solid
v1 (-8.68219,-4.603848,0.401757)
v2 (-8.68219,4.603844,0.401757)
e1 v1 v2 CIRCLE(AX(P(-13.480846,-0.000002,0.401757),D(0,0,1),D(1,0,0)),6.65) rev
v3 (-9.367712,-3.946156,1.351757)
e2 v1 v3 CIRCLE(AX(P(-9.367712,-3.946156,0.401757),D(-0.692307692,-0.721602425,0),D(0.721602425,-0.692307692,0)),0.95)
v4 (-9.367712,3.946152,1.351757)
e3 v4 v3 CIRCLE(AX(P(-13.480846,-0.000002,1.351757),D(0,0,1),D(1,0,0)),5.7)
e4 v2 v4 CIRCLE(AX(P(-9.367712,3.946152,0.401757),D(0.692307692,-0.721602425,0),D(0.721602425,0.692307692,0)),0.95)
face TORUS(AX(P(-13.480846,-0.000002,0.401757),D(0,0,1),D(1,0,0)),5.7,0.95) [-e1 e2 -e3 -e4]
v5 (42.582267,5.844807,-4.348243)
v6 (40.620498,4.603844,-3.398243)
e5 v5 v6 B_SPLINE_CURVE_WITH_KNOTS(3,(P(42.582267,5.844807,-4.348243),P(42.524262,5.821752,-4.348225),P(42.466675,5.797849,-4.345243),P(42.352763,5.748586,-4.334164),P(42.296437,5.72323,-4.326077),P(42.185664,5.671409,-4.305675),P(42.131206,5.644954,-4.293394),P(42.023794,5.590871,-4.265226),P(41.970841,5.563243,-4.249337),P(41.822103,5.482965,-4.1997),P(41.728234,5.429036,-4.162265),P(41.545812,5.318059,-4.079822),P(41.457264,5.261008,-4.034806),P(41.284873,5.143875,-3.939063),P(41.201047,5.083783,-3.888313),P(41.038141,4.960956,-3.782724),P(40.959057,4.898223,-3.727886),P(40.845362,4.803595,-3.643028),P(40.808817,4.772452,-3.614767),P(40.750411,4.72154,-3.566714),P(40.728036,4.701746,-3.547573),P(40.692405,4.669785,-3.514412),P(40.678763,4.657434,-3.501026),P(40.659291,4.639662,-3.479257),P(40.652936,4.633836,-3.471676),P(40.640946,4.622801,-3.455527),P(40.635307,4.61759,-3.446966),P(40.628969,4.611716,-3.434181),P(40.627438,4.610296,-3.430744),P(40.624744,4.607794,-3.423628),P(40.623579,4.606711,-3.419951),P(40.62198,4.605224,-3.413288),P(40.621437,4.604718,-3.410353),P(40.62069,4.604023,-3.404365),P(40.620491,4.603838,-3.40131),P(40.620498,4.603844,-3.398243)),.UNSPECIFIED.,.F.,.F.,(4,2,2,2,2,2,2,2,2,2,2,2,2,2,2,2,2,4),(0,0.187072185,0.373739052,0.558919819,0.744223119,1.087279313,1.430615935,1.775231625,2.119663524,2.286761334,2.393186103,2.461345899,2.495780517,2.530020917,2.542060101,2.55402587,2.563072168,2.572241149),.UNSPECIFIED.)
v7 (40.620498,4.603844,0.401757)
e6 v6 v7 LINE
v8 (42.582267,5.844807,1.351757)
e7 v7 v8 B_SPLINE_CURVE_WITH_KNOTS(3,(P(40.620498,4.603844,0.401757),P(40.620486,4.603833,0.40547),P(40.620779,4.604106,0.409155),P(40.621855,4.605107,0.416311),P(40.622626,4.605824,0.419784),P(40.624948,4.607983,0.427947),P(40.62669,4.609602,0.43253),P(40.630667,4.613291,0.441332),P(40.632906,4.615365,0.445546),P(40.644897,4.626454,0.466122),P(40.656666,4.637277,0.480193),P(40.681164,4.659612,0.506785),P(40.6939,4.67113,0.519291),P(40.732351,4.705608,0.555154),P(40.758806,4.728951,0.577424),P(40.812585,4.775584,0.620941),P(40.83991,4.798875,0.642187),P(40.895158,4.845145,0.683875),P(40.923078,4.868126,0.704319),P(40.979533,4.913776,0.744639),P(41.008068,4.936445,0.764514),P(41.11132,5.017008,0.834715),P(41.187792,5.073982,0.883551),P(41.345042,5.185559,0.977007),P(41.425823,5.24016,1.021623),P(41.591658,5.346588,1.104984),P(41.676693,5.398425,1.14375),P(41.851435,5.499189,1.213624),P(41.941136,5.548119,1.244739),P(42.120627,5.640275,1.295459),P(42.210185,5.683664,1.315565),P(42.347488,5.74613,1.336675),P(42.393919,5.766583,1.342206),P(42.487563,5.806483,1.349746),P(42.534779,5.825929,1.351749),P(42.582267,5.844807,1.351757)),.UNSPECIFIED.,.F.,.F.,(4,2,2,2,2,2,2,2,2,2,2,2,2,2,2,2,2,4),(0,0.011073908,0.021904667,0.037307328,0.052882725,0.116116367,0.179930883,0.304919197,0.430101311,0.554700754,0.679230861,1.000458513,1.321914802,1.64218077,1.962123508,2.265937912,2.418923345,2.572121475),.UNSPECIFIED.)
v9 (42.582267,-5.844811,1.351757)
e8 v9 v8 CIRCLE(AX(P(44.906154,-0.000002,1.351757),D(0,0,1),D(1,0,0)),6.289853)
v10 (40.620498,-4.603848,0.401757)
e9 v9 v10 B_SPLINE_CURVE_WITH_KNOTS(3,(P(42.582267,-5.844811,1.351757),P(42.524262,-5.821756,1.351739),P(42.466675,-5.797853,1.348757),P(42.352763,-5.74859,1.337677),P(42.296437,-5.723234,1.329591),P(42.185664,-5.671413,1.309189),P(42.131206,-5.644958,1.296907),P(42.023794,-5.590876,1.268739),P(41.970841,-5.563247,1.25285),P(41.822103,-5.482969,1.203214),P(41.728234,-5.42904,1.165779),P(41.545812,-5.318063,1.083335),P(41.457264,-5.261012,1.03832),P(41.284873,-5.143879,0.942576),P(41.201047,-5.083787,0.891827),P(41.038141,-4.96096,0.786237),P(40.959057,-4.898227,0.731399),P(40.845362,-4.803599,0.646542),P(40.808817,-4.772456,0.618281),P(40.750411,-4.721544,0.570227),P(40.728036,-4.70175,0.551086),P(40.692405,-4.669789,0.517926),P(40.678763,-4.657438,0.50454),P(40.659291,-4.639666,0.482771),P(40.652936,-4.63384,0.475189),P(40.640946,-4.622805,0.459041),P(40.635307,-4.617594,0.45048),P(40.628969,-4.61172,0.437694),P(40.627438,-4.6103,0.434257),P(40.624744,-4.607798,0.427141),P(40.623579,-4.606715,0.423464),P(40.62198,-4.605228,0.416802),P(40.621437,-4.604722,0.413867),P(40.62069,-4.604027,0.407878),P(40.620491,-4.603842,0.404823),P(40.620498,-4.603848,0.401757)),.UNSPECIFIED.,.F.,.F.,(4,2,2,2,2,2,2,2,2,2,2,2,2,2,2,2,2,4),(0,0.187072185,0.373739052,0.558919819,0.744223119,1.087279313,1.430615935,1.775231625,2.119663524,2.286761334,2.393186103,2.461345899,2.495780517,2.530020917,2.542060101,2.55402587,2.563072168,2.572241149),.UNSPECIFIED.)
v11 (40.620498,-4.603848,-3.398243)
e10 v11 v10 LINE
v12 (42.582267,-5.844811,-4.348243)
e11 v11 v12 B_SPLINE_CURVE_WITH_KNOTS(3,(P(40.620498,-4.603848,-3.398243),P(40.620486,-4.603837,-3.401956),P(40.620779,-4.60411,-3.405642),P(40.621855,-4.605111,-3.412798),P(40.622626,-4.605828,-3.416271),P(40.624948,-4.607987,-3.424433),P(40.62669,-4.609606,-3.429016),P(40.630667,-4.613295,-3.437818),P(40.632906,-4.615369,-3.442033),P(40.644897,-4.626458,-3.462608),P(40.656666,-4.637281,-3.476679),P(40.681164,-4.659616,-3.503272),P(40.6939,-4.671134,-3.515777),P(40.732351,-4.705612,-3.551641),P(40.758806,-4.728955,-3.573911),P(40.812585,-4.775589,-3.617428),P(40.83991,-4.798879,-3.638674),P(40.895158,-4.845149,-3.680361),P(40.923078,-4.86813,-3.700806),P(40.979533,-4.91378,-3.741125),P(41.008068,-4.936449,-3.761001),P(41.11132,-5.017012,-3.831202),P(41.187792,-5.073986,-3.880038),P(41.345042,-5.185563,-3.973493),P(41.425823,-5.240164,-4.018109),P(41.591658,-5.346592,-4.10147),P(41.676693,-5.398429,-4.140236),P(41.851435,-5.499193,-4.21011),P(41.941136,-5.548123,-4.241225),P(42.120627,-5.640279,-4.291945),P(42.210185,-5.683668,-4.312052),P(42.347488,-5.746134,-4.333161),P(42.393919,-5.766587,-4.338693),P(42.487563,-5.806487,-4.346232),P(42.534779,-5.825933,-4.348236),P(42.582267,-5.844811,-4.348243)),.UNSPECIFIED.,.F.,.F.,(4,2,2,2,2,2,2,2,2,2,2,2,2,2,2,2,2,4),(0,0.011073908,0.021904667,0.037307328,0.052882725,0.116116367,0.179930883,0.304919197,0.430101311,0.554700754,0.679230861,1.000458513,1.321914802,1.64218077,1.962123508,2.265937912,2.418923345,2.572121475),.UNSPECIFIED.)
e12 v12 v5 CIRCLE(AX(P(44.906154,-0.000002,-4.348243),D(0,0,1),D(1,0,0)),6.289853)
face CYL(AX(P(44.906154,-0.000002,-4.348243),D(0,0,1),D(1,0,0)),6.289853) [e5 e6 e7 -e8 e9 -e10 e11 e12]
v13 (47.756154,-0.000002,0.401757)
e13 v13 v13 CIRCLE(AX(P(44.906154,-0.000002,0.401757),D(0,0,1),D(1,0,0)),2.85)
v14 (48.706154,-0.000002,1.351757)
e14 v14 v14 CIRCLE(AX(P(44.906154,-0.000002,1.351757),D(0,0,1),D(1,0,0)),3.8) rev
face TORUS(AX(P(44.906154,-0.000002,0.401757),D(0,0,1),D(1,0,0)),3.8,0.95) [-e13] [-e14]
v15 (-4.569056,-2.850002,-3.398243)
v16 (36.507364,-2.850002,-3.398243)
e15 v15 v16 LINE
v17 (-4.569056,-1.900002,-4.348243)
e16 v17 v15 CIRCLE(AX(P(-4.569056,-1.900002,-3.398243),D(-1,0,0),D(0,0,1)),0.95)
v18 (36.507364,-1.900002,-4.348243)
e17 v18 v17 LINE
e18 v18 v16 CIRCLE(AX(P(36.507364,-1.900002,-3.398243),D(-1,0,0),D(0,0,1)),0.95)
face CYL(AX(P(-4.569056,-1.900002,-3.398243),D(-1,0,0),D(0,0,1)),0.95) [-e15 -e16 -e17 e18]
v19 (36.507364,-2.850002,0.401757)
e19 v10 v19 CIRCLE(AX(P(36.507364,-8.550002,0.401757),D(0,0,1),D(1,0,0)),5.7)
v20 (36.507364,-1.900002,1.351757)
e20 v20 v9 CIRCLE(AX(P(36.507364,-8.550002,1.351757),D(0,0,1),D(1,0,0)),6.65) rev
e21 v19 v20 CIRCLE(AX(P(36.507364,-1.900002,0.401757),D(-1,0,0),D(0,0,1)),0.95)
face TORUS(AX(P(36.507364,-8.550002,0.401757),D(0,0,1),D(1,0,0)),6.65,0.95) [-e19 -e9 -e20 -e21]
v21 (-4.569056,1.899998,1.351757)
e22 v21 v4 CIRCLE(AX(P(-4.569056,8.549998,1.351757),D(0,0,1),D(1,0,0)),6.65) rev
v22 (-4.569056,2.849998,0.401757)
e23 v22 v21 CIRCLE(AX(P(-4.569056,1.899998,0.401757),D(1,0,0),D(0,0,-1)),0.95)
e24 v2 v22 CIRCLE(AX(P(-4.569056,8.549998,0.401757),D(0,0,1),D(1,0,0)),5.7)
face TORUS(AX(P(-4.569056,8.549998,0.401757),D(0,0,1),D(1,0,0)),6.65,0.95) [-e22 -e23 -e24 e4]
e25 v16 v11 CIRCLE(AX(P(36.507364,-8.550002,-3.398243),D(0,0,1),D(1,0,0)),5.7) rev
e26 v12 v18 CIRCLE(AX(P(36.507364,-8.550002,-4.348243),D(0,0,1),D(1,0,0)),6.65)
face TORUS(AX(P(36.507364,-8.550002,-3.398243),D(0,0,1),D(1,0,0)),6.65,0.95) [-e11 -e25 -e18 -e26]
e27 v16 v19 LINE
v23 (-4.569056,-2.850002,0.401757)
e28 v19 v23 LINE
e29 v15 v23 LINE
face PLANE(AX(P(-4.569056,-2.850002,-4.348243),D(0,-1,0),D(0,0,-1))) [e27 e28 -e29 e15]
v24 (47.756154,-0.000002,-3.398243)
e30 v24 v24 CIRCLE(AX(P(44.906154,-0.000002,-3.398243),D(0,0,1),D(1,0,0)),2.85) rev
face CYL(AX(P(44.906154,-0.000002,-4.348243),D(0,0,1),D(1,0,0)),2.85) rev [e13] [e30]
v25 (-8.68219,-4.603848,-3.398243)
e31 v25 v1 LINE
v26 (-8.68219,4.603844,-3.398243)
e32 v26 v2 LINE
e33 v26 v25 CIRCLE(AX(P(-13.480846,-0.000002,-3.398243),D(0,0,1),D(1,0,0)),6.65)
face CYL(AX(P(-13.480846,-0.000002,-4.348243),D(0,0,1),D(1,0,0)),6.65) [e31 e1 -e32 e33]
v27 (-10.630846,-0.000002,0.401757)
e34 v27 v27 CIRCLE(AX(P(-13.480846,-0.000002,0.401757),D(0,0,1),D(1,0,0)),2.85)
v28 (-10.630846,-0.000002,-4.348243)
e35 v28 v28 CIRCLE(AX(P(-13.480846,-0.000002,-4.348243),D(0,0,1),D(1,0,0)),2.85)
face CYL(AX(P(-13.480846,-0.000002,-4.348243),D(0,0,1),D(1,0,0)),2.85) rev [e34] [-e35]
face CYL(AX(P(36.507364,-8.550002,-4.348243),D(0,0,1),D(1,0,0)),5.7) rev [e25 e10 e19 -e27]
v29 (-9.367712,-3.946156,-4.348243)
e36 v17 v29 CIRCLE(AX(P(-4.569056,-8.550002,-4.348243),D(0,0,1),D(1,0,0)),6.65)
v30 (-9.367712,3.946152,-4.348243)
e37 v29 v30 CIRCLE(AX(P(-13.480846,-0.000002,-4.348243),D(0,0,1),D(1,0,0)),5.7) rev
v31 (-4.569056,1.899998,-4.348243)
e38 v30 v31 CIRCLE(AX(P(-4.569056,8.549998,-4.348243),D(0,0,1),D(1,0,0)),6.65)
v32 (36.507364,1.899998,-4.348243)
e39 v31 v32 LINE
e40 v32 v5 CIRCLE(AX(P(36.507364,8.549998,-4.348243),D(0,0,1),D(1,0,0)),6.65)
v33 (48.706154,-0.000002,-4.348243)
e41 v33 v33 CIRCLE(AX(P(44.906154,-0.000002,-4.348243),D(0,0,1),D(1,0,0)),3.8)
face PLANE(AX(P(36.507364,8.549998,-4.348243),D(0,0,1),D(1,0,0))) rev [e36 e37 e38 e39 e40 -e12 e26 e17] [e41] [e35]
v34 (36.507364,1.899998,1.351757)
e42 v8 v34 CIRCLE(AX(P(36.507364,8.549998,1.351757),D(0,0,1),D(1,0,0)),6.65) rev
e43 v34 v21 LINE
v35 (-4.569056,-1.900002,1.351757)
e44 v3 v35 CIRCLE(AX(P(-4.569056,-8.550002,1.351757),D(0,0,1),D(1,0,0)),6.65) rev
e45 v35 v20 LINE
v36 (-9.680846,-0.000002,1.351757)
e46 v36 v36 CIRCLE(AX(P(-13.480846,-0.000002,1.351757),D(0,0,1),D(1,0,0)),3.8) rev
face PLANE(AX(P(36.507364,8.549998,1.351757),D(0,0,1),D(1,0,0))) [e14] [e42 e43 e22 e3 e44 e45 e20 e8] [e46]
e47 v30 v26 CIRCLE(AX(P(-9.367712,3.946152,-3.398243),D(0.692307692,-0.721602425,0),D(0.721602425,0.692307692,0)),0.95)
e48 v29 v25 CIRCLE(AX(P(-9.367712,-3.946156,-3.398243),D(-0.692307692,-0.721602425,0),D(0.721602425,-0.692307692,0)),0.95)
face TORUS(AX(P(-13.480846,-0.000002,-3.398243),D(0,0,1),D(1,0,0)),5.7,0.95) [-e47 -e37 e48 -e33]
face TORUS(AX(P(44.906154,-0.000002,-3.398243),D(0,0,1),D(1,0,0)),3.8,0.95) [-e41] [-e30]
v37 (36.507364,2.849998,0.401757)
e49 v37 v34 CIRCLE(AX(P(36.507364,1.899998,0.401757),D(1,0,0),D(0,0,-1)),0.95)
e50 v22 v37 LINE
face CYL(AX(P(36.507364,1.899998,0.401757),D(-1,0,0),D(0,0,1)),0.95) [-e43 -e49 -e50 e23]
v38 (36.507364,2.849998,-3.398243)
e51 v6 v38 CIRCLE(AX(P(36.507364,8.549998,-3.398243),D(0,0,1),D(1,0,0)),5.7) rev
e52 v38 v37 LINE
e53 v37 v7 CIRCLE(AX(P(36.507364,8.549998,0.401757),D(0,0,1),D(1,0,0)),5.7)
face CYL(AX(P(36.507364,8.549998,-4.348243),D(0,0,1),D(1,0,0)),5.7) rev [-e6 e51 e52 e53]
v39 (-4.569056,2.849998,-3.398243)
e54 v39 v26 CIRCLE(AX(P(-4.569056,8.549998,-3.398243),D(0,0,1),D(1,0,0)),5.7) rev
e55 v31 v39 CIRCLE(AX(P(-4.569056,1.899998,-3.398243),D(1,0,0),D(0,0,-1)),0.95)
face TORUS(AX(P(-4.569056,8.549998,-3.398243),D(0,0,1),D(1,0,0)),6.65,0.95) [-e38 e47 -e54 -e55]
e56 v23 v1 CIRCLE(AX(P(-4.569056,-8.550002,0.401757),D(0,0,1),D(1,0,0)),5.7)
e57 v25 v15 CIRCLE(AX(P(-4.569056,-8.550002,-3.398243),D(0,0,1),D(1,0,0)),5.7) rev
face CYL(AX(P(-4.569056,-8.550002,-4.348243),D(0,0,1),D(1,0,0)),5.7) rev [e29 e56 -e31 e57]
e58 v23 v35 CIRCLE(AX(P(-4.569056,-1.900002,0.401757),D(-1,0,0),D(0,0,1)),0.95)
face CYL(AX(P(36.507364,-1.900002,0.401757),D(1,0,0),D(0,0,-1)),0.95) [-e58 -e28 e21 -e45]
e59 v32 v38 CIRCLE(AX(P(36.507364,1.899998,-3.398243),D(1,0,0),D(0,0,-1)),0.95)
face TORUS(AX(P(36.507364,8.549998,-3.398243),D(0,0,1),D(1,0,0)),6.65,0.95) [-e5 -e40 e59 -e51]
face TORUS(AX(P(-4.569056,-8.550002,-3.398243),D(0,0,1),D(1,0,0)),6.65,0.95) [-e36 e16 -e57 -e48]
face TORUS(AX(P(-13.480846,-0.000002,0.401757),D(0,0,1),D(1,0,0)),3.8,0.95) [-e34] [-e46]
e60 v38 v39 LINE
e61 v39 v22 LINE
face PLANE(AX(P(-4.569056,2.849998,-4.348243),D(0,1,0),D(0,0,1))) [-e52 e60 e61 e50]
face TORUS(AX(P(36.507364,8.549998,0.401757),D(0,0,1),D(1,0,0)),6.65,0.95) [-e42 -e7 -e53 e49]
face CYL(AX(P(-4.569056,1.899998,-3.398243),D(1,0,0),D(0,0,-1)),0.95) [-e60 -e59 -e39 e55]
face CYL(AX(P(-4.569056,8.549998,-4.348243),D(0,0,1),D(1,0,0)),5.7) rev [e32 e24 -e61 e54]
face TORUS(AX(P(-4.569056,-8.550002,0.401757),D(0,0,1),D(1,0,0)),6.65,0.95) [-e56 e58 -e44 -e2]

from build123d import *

# Parameters (mm, degrees)
SKETCH1_R           = 1.5
SKETCH1_R_2         = 1.500000000000004
BOSS_EXTRUDE1_DEPTH = 3
FILLET1_R           = 0.5
SCALE1_SCALE        = 1.9


with BuildPart() as part:
    # Sketch1 → Boss-Extrude1 (new body)
    with BuildSketch(Plane.XY):
        with BuildLine():
            Line((4.690415759823431, 1.5), (26.30958424017657, 1.5))
            ThreePointArc((26.30958424017657, 1.5), (27.486281051005673, 1.7404013669766005), (28.474391513941228, 2.4230769230769225))
            ThreePointArc((28.474391513941228, 2.4230769230769225), (34.04044882418204, 0), (28.474391513941228, -2.4230769230769225))
            ThreePointArc((28.474391513941228, -2.4230769230769225), (27.486281051005673, -1.7404013669766005), (26.30958424017657, -1.5))
            Line((26.30958424017657, -1.5), (4.690415759823431, -1.5))
            ThreePointArc((4.690415759823431, -1.5), (3.5137189489943266, -1.7404013669766005), (2.5256084860587706, -2.4230769230769234))
            ThreePointArc((2.5256084860587706, -2.4230769230769234), (-3.500000000000001, 4.3e-16), (2.5256084860587706, 2.4230769230769234))
            ThreePointArc((2.5256084860587706, 2.4230769230769234), (3.5137189489943266, 1.7404013669766005), (4.690415759823431, 1.5))
        make_face()
        Circle(SKETCH1_R, mode=Mode.SUBTRACT)
        with Locations((30.73, 0)):
            Circle(SKETCH1_R_2, mode=Mode.SUBTRACT)
    extrude(amount=-BOSS_EXTRUDE1_DEPTH)

    # Fillet1
    # the kernel refuses this fillet: 0.5 mm, written as the material it takes off along each edge
    with BuildSketch(Plane(origin=(-6e-17, 2.2e-16, 0), x_dir=(0.7216024245882201, -0.6923076923076922, 0), z_dir=(0.6923076923076922, 0.7216024245882201, 0))) as fillet1_piece_1:
        with BuildLine():
            CenterArc((3.5000000000000013 - FILLET1_R, FILLET1_R), FILLET1_R, 269.99999999999994, 90.00000000000006)
            Line((3.5000000000000013 - FILLET1_R, -6e-17), (3.5000000000000013, 0))
            Line((3.5000000000000013, 0), (3.5000000000000013, FILLET1_R))
        make_face()
    revolve(axis=Axis((-6e-17, 2.2e-16, 0), (0, 0, -1)), revolution_arc=272.37387707919373, mode=Mode.SUBTRACT)
    with BuildSketch(Plane(origin=(4.6904157598234315, 4.5, 0), x_dir=(-0.7216024245882201, -0.6923076923076921, 0), z_dir=(-0.6923076923076921, 0.7216024245882201, 0))) as fillet1_piece_2:
        with BuildLine():
            CenterArc((3 + FILLET1_R, -FILLET1_R), FILLET1_R, 89.99999999999994, 90.00000000000006)
            Line((3 + FILLET1_R, 6e-17), (3, 0))
            Line((3, 0), (2.9999999999999996, -FILLET1_R))
        make_face()
    revolve(axis=Axis((4.6904157598234315, 4.5, 0), (0, 0, 1)), revolution_arc=46.18693853959685, mode=Mode.SUBTRACT)
    with BuildSketch(Plane(origin=(4.690415759823431, 1.5, 0), x_dir=(0, 0, -1), z_dir=(1, 0, 0)), Plane(origin=(26.30958424017657, -1.5, 0), x_dir=(0, 0, -1), z_dir=(-1, 0, 0))) as fillet1_piece_3:
        with BuildLine():
            CenterArc((FILLET1_R, -FILLET1_R), FILLET1_R, 90, 90)
            Line((-6e-17, -FILLET1_R), (0, 0))
            Line((0, 0), (FILLET1_R, 0))
        make_face()
    extrude(amount=21.61916848035314, mode=Mode.SUBTRACT)
    with BuildSketch(Plane(origin=(26.309584240176566, 4.500000000000009, 0), x_dir=(1.18e-15, -1, 0), z_dir=(-1, -1.18e-15, 0))) as fillet1_piece_4:
        with BuildLine():
            CenterArc((3.000000000000009 + FILLET1_R, -FILLET1_R), FILLET1_R, 90, 90)
            Line((3.000000000000009 + FILLET1_R, 6e-17), (3.000000000000009, 0))
            Line((3.000000000000009, 0), (3.000000000000009, -FILLET1_R))
        make_face()
    revolve(axis=Axis((26.309584240176566, 4.500000000000009, 0), (0, 0, 1)), revolution_arc=70.06270514317328, mode=Mode.SUBTRACT)
    with BuildSketch(Plane(origin=(4.6904157598234315, 4.5, -3), x_dir=(-0.7216024245882201, -0.6923076923076921, 0), z_dir=(-0.6923076923076921, 0.7216024245882201, 0))) as fillet1_piece_5:
        with BuildLine():
            CenterArc((3 + FILLET1_R, FILLET1_R), FILLET1_R, 180, 90.00000000000006)
            Line((3 + FILLET1_R, 0), (3, 0))
            Line((3, 0), (2.9999999999999996, FILLET1_R))
        make_face()
    revolve(axis=Axis((4.6904157598234315, 4.5, -3), (0, 0, 1)), revolution_arc=46.18693853959685, mode=Mode.SUBTRACT)
    with BuildSketch(Plane(origin=(-6e-17, 2.2e-16, -3), x_dir=(0.7216024245882201, -0.6923076923076922, 0), z_dir=(0.6923076923076922, 0.7216024245882201, 0))) as fillet1_piece_6:
        with BuildLine():
            CenterArc((3.5000000000000013 - FILLET1_R, -FILLET1_R), FILLET1_R, 0, 90.00000000000006)
            Line((3.5000000000000013 - FILLET1_R, 0), (3.5000000000000013, 0))
            Line((3.5000000000000013, 0), (3.5000000000000013, -FILLET1_R))
        make_face()
    revolve(axis=Axis((-6e-17, 2.2e-16, -3), (0, 0, -1)), revolution_arc=272.37387707919373, mode=Mode.SUBTRACT)
    with BuildSketch(Plane(origin=(4.6904157598234315, -4.500000000000001, -3), x_dir=(-3e-16, 1, 0), z_dir=(1, 3e-16, 0))) as fillet1_piece_7:
        with BuildLine():
            CenterArc((3.0000000000000013 + FILLET1_R, FILLET1_R), FILLET1_R, 180, 90)
            Line((3.0000000000000013 + FILLET1_R, 0), (3.0000000000000013, 0))
            Line((3.0000000000000013, 0), (3.0000000000000013, FILLET1_R))
        make_face()
    revolve(axis=Axis((4.6904157598234315, -4.500000000000001, -3), (0, 0, 1)), revolution_arc=46.186938539596845, mode=Mode.SUBTRACT)
    with BuildSketch(Plane(origin=(0, 0, 0), x_dir=(1, 0, 0), z_dir=(0, -1, 0))) as fillet1_piece_8:
        with BuildLine():
            CenterArc((1.5 + FILLET1_R, -FILLET1_R), FILLET1_R, 90, 90)
            Line((1.5 + FILLET1_R, 6e-17), (1.5, 0))
            Line((1.5, 0), (1.5, -FILLET1_R))
        make_face()
    revolve(axis=Axis((0, 0, 0), (0, 0, 1)), mode=Mode.SUBTRACT)
    with BuildSketch(Plane(origin=(26.30958424017657, -1.5, -3), x_dir=(0, 0, 1), z_dir=(-1, 0, 0)), Plane(origin=(4.690415759823431, 1.5, -3), x_dir=(0, 0, 1), z_dir=(1, 0, 0))) as fillet1_piece_9:
        with BuildLine():
            CenterArc((FILLET1_R, FILLET1_R), FILLET1_R, 180, 90)
            Line((0, FILLET1_R), (0, 0))
            Line((0, 0), (FILLET1_R, 0))
        make_face()
    extrude(amount=21.61916848035314, mode=Mode.SUBTRACT)
    with BuildSketch(Plane(origin=(30.73, 0, -3), x_dir=(1, 0, 0), z_dir=(0, -1, 0))) as fillet1_piece_10:
        with BuildLine():
            CenterArc((1.5000000000000036 + FILLET1_R, FILLET1_R), FILLET1_R, 180, 90)
            Line((1.5000000000000036 + FILLET1_R, 0), (1.5000000000000036, 0))
            Line((1.5000000000000036, 0), (1.5000000000000036, FILLET1_R))
        make_face()
    revolve(axis=Axis((30.73, 0, -3), (0, 0, 1)), mode=Mode.SUBTRACT)
    with BuildSketch(Plane(origin=(30.73, 0, 0), x_dir=(1, 0, 0), z_dir=(0, -1, 0))) as fillet1_piece_11:
        with BuildLine():
            CenterArc((1.5000000000000036 + FILLET1_R, -FILLET1_R), FILLET1_R, 90, 90)
            Line((1.5000000000000036 + FILLET1_R, 6e-17), (1.5000000000000036, 0))
            Line((1.5000000000000036, 0), (1.5000000000000036, -FILLET1_R))
        make_face()
    revolve(axis=Axis((30.73, 0, 0), (0, 0, 1)), mode=Mode.SUBTRACT)
    with BuildSketch(Plane(origin=(26.309584240176562, -4.500000000000011, -3), x_dir=(0.9400663686370947, 0.3409915285714087, 0), z_dir=(0.3409915285714087, -0.9400663686370947, 0))) as fillet1_piece_12:
        with BuildLine():
            CenterArc((3.0000000000000124 + FILLET1_R, FILLET1_R), FILLET1_R, 180, 90.00000000000023)
            Line((3.0000000000000124 + FILLET1_R, 0), (3.0000000000000124, 0))
            Line((3.0000000000000124, 0), (3.00000000000001, FILLET1_R))
        make_face()
    revolve(axis=Axis((26.309584240176562, -4.500000000000011, -3), (0, 0, 1)), revolution_arc=70.0627051431732, mode=Mode.SUBTRACT)
    with BuildSketch(Plane(origin=(26.309584240176566, 4.500000000000009, -3), x_dir=(1.18e-15, -1, 0), z_dir=(-1, -1.18e-15, 0))) as fillet1_piece_13:
        with BuildLine():
            CenterArc((3.000000000000009 + FILLET1_R, FILLET1_R), FILLET1_R, 180, 90)
            Line((3.000000000000009 + FILLET1_R, 0), (3.000000000000009, 0))
            Line((3.000000000000009, 0), (3.000000000000009, FILLET1_R))
        make_face()
    revolve(axis=Axis((26.309584240176566, 4.500000000000009, -3), (0, 0, 1)), revolution_arc=70.06270514317328, mode=Mode.SUBTRACT)
    with BuildSketch(Plane(origin=(26.309584240176562, -4.500000000000011, 0), x_dir=(0.9400663686370947, 0.34099152857140885, 0), z_dir=(0.34099152857140885, -0.9400663686370947, 0))) as fillet1_piece_14:
        with BuildLine():
            CenterArc((3.000000000000013 + FILLET1_R, -FILLET1_R), FILLET1_R, 89.99999999999969, 90.00000000000034)
            Line((3.000000000000013 + FILLET1_R, 6e-17), (3.000000000000013, 0))
            Line((3.000000000000013, 0), (3.00000000000001, -FILLET1_R))
        make_face()
    revolve(axis=Axis((26.309584240176562, -4.500000000000011, 0), (0, 0, 1)), revolution_arc=70.0627051431732, mode=Mode.SUBTRACT)
    with BuildSketch(Plane(origin=(4.6904157598234315, -4.500000000000001, 0), x_dir=(-3e-16, 1, 0), z_dir=(1, 3e-16, 0))) as fillet1_piece_15:
        with BuildLine():
            CenterArc((3.0000000000000013 + FILLET1_R, -FILLET1_R), FILLET1_R, 90, 90)
            Line((3.0000000000000013 + FILLET1_R, 6e-17), (3.0000000000000013, 0))
            Line((3.0000000000000013, 0), (3.0000000000000013, -FILLET1_R))
        make_face()
    revolve(axis=Axis((4.6904157598234315, -4.500000000000001, 0), (0, 0, 1)), revolution_arc=46.186938539596845, mode=Mode.SUBTRACT)


with BuildPart() as part_1:
    # Scale1: scaled about (14.97872549, -2.3e-08, -1.501949576)
    add(part.part.scale(SCALE1_SCALE).moved(Location((-13.480852940999998, 2.07e-08, 1.3517546183999998))))


solid = part_1.part
